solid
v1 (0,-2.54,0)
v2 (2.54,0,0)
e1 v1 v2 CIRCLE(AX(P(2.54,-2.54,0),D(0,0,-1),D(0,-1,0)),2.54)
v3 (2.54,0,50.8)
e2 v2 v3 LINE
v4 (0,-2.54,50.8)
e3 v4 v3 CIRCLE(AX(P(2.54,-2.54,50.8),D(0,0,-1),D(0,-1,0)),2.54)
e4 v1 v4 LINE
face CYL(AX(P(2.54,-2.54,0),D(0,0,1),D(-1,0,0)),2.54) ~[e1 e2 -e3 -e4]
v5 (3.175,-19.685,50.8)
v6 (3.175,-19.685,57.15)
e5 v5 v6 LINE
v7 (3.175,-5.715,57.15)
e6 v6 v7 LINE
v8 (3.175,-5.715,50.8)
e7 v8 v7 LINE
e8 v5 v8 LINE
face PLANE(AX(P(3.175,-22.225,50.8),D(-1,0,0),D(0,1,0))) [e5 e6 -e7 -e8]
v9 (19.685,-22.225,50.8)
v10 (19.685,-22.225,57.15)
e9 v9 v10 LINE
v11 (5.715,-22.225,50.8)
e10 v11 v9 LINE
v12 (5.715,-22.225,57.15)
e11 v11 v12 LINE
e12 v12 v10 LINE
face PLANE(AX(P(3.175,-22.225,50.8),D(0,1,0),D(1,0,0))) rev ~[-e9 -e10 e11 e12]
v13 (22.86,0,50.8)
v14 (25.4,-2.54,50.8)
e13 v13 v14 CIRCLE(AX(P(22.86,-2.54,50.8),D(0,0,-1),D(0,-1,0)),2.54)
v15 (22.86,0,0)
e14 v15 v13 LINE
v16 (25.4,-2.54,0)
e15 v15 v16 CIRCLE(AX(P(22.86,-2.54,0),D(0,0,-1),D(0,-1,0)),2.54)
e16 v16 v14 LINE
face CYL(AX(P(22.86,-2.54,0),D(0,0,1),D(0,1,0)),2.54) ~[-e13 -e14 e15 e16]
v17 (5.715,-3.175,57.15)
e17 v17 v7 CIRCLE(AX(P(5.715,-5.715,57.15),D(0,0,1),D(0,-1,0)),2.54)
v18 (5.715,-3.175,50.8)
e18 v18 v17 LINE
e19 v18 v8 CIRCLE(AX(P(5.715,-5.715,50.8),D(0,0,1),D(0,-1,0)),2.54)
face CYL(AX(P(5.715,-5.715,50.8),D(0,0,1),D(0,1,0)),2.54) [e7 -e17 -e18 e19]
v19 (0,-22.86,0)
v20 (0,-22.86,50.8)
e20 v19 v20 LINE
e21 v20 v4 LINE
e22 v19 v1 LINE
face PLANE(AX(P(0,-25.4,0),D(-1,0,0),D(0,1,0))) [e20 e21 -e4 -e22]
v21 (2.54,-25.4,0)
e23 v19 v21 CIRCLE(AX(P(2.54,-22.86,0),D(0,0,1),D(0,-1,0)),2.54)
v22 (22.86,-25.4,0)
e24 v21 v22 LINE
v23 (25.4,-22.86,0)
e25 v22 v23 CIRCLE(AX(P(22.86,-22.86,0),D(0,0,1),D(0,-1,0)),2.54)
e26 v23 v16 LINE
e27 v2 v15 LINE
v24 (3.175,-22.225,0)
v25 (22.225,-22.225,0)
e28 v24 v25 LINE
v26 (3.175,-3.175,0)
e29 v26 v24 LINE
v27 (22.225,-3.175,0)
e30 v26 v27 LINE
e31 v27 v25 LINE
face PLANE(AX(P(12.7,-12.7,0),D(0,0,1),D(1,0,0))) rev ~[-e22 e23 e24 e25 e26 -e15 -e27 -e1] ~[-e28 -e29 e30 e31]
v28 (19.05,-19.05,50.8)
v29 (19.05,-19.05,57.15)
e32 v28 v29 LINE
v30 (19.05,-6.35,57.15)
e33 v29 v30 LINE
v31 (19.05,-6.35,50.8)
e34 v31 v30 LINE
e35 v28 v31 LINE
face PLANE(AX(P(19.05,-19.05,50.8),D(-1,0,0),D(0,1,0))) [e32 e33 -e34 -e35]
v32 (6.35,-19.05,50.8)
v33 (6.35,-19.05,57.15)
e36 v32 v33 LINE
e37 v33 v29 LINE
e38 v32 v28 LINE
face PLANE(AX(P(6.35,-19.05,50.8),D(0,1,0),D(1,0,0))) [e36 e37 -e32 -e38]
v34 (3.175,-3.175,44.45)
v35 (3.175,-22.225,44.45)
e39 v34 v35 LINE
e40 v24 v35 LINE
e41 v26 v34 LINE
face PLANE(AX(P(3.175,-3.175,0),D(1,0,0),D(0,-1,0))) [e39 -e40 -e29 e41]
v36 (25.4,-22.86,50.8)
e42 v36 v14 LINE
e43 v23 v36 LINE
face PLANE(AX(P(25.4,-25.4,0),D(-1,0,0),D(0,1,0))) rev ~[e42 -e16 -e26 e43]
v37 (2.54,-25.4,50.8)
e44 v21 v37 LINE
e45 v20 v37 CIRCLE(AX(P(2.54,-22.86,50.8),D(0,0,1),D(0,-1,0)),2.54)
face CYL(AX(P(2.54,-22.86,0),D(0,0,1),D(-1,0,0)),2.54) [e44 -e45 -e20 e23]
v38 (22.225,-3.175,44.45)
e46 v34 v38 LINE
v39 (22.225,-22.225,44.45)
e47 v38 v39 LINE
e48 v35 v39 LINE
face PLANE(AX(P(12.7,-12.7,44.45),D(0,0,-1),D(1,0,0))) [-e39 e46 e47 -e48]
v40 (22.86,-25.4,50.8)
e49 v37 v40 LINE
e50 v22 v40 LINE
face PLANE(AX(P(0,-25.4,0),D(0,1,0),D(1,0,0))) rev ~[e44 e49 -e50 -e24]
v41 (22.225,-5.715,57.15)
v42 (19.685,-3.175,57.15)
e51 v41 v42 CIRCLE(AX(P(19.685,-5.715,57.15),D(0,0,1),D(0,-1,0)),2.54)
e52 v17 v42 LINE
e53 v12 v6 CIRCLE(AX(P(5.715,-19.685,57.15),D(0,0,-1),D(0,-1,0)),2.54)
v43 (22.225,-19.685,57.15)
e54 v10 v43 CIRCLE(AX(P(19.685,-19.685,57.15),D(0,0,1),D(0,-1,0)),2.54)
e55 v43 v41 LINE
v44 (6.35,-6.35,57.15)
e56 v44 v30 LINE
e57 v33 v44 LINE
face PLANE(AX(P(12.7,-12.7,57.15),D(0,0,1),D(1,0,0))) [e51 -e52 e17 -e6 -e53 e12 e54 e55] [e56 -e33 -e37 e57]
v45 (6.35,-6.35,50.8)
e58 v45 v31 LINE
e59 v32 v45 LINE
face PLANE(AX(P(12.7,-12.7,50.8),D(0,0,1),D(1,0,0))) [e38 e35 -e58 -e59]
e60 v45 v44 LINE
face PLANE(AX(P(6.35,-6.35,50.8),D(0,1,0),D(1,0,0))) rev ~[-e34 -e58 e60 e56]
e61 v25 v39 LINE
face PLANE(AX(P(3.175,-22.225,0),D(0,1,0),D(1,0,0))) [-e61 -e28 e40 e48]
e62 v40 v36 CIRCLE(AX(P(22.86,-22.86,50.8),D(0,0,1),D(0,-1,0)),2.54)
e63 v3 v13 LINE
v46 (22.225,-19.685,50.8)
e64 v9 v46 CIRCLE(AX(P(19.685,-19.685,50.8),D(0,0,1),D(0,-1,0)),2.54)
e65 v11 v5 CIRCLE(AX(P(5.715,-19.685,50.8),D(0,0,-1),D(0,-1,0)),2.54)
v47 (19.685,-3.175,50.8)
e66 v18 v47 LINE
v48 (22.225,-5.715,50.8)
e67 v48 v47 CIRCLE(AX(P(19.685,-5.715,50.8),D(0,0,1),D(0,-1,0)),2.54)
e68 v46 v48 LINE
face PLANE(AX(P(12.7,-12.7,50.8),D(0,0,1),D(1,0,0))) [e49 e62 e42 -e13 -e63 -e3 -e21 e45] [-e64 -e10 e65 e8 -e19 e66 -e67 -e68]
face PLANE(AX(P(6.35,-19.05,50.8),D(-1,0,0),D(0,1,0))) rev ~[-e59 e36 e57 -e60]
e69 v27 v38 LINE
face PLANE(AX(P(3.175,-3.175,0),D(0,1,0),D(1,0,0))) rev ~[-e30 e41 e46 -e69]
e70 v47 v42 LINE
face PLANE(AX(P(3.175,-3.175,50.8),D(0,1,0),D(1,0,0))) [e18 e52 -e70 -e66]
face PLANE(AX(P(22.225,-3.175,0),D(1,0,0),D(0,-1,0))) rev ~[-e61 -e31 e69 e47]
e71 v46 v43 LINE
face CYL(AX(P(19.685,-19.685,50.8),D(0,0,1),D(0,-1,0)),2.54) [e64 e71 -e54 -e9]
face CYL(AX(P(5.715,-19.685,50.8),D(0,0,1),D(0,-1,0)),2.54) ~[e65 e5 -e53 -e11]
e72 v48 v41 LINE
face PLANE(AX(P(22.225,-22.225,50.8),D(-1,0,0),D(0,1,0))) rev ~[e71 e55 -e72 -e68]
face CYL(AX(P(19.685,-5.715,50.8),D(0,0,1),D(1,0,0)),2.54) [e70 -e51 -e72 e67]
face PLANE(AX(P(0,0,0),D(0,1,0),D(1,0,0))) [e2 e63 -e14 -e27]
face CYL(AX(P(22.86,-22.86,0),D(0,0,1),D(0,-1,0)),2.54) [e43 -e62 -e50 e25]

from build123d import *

# Parameters (mm, degrees)
F0_W     = 25.4
F0_H     = 25.4
F1_DEPTH = 50.8
F2_W     = 19.05
F2_H     = 19.05
F3_DEPTH = 44.45
F4_W     = 19.05
F4_H     = 19.05
F4_W_2   = 12.7
F4_H_2   = 12.7
F5_DEPTH = 6.35
F6_R     = 2.54


# Not quite as in the source:
# - a feature names something its author has since deleted; it is built from what else it names


with BuildPart() as f1:
    # F0 (on Top) → F1 (new body)
    with BuildSketch(Plane.XY):
        with Locations((12.7, -12.7)):
            Rectangle(F0_W, F0_H)
    extrude(amount=F1_DEPTH)

    # F2 (on face) → F3 (cut)
    with BuildSketch(Plane(origin=(0, 0, 0), x_dir=(1, 0, 0), z_dir=(0, 0, -1))):
        with Locations((12.7, 12.7)):
            Rectangle(F2_W, F2_H)
    extrude(amount=-F3_DEPTH, mode=Mode.SUBTRACT)

    # F4 (on face) → F5 (join)
    with BuildSketch(Plane.XY.offset(50.8)):
        with Locations((12.7, -12.7)):
            Rectangle(F4_W, F4_H)
        with Locations((12.7, -12.7)):
            Rectangle(F4_W_2, F4_H_2, mode=Mode.SUBTRACT)
    extrude(amount=F5_DEPTH)

    # F6
    f6_edges = [f1.edges().sort_by_distance(p)[0] for p in [
        (0, 0, 25.4),
        (0, -25.4, 25.4),
        (25.4, 0, 25.4),
        (3.175, -3.175, 53.975),
        (3.175, -22.225, 53.975),
        (22.225, -3.175, 53.975),
        (22.225, -22.225, 53.975),
        (25.4, -25.4, 25.4),
    ]]
    fillet(f6_edges, radius=F6_R)


solid = f1.part
